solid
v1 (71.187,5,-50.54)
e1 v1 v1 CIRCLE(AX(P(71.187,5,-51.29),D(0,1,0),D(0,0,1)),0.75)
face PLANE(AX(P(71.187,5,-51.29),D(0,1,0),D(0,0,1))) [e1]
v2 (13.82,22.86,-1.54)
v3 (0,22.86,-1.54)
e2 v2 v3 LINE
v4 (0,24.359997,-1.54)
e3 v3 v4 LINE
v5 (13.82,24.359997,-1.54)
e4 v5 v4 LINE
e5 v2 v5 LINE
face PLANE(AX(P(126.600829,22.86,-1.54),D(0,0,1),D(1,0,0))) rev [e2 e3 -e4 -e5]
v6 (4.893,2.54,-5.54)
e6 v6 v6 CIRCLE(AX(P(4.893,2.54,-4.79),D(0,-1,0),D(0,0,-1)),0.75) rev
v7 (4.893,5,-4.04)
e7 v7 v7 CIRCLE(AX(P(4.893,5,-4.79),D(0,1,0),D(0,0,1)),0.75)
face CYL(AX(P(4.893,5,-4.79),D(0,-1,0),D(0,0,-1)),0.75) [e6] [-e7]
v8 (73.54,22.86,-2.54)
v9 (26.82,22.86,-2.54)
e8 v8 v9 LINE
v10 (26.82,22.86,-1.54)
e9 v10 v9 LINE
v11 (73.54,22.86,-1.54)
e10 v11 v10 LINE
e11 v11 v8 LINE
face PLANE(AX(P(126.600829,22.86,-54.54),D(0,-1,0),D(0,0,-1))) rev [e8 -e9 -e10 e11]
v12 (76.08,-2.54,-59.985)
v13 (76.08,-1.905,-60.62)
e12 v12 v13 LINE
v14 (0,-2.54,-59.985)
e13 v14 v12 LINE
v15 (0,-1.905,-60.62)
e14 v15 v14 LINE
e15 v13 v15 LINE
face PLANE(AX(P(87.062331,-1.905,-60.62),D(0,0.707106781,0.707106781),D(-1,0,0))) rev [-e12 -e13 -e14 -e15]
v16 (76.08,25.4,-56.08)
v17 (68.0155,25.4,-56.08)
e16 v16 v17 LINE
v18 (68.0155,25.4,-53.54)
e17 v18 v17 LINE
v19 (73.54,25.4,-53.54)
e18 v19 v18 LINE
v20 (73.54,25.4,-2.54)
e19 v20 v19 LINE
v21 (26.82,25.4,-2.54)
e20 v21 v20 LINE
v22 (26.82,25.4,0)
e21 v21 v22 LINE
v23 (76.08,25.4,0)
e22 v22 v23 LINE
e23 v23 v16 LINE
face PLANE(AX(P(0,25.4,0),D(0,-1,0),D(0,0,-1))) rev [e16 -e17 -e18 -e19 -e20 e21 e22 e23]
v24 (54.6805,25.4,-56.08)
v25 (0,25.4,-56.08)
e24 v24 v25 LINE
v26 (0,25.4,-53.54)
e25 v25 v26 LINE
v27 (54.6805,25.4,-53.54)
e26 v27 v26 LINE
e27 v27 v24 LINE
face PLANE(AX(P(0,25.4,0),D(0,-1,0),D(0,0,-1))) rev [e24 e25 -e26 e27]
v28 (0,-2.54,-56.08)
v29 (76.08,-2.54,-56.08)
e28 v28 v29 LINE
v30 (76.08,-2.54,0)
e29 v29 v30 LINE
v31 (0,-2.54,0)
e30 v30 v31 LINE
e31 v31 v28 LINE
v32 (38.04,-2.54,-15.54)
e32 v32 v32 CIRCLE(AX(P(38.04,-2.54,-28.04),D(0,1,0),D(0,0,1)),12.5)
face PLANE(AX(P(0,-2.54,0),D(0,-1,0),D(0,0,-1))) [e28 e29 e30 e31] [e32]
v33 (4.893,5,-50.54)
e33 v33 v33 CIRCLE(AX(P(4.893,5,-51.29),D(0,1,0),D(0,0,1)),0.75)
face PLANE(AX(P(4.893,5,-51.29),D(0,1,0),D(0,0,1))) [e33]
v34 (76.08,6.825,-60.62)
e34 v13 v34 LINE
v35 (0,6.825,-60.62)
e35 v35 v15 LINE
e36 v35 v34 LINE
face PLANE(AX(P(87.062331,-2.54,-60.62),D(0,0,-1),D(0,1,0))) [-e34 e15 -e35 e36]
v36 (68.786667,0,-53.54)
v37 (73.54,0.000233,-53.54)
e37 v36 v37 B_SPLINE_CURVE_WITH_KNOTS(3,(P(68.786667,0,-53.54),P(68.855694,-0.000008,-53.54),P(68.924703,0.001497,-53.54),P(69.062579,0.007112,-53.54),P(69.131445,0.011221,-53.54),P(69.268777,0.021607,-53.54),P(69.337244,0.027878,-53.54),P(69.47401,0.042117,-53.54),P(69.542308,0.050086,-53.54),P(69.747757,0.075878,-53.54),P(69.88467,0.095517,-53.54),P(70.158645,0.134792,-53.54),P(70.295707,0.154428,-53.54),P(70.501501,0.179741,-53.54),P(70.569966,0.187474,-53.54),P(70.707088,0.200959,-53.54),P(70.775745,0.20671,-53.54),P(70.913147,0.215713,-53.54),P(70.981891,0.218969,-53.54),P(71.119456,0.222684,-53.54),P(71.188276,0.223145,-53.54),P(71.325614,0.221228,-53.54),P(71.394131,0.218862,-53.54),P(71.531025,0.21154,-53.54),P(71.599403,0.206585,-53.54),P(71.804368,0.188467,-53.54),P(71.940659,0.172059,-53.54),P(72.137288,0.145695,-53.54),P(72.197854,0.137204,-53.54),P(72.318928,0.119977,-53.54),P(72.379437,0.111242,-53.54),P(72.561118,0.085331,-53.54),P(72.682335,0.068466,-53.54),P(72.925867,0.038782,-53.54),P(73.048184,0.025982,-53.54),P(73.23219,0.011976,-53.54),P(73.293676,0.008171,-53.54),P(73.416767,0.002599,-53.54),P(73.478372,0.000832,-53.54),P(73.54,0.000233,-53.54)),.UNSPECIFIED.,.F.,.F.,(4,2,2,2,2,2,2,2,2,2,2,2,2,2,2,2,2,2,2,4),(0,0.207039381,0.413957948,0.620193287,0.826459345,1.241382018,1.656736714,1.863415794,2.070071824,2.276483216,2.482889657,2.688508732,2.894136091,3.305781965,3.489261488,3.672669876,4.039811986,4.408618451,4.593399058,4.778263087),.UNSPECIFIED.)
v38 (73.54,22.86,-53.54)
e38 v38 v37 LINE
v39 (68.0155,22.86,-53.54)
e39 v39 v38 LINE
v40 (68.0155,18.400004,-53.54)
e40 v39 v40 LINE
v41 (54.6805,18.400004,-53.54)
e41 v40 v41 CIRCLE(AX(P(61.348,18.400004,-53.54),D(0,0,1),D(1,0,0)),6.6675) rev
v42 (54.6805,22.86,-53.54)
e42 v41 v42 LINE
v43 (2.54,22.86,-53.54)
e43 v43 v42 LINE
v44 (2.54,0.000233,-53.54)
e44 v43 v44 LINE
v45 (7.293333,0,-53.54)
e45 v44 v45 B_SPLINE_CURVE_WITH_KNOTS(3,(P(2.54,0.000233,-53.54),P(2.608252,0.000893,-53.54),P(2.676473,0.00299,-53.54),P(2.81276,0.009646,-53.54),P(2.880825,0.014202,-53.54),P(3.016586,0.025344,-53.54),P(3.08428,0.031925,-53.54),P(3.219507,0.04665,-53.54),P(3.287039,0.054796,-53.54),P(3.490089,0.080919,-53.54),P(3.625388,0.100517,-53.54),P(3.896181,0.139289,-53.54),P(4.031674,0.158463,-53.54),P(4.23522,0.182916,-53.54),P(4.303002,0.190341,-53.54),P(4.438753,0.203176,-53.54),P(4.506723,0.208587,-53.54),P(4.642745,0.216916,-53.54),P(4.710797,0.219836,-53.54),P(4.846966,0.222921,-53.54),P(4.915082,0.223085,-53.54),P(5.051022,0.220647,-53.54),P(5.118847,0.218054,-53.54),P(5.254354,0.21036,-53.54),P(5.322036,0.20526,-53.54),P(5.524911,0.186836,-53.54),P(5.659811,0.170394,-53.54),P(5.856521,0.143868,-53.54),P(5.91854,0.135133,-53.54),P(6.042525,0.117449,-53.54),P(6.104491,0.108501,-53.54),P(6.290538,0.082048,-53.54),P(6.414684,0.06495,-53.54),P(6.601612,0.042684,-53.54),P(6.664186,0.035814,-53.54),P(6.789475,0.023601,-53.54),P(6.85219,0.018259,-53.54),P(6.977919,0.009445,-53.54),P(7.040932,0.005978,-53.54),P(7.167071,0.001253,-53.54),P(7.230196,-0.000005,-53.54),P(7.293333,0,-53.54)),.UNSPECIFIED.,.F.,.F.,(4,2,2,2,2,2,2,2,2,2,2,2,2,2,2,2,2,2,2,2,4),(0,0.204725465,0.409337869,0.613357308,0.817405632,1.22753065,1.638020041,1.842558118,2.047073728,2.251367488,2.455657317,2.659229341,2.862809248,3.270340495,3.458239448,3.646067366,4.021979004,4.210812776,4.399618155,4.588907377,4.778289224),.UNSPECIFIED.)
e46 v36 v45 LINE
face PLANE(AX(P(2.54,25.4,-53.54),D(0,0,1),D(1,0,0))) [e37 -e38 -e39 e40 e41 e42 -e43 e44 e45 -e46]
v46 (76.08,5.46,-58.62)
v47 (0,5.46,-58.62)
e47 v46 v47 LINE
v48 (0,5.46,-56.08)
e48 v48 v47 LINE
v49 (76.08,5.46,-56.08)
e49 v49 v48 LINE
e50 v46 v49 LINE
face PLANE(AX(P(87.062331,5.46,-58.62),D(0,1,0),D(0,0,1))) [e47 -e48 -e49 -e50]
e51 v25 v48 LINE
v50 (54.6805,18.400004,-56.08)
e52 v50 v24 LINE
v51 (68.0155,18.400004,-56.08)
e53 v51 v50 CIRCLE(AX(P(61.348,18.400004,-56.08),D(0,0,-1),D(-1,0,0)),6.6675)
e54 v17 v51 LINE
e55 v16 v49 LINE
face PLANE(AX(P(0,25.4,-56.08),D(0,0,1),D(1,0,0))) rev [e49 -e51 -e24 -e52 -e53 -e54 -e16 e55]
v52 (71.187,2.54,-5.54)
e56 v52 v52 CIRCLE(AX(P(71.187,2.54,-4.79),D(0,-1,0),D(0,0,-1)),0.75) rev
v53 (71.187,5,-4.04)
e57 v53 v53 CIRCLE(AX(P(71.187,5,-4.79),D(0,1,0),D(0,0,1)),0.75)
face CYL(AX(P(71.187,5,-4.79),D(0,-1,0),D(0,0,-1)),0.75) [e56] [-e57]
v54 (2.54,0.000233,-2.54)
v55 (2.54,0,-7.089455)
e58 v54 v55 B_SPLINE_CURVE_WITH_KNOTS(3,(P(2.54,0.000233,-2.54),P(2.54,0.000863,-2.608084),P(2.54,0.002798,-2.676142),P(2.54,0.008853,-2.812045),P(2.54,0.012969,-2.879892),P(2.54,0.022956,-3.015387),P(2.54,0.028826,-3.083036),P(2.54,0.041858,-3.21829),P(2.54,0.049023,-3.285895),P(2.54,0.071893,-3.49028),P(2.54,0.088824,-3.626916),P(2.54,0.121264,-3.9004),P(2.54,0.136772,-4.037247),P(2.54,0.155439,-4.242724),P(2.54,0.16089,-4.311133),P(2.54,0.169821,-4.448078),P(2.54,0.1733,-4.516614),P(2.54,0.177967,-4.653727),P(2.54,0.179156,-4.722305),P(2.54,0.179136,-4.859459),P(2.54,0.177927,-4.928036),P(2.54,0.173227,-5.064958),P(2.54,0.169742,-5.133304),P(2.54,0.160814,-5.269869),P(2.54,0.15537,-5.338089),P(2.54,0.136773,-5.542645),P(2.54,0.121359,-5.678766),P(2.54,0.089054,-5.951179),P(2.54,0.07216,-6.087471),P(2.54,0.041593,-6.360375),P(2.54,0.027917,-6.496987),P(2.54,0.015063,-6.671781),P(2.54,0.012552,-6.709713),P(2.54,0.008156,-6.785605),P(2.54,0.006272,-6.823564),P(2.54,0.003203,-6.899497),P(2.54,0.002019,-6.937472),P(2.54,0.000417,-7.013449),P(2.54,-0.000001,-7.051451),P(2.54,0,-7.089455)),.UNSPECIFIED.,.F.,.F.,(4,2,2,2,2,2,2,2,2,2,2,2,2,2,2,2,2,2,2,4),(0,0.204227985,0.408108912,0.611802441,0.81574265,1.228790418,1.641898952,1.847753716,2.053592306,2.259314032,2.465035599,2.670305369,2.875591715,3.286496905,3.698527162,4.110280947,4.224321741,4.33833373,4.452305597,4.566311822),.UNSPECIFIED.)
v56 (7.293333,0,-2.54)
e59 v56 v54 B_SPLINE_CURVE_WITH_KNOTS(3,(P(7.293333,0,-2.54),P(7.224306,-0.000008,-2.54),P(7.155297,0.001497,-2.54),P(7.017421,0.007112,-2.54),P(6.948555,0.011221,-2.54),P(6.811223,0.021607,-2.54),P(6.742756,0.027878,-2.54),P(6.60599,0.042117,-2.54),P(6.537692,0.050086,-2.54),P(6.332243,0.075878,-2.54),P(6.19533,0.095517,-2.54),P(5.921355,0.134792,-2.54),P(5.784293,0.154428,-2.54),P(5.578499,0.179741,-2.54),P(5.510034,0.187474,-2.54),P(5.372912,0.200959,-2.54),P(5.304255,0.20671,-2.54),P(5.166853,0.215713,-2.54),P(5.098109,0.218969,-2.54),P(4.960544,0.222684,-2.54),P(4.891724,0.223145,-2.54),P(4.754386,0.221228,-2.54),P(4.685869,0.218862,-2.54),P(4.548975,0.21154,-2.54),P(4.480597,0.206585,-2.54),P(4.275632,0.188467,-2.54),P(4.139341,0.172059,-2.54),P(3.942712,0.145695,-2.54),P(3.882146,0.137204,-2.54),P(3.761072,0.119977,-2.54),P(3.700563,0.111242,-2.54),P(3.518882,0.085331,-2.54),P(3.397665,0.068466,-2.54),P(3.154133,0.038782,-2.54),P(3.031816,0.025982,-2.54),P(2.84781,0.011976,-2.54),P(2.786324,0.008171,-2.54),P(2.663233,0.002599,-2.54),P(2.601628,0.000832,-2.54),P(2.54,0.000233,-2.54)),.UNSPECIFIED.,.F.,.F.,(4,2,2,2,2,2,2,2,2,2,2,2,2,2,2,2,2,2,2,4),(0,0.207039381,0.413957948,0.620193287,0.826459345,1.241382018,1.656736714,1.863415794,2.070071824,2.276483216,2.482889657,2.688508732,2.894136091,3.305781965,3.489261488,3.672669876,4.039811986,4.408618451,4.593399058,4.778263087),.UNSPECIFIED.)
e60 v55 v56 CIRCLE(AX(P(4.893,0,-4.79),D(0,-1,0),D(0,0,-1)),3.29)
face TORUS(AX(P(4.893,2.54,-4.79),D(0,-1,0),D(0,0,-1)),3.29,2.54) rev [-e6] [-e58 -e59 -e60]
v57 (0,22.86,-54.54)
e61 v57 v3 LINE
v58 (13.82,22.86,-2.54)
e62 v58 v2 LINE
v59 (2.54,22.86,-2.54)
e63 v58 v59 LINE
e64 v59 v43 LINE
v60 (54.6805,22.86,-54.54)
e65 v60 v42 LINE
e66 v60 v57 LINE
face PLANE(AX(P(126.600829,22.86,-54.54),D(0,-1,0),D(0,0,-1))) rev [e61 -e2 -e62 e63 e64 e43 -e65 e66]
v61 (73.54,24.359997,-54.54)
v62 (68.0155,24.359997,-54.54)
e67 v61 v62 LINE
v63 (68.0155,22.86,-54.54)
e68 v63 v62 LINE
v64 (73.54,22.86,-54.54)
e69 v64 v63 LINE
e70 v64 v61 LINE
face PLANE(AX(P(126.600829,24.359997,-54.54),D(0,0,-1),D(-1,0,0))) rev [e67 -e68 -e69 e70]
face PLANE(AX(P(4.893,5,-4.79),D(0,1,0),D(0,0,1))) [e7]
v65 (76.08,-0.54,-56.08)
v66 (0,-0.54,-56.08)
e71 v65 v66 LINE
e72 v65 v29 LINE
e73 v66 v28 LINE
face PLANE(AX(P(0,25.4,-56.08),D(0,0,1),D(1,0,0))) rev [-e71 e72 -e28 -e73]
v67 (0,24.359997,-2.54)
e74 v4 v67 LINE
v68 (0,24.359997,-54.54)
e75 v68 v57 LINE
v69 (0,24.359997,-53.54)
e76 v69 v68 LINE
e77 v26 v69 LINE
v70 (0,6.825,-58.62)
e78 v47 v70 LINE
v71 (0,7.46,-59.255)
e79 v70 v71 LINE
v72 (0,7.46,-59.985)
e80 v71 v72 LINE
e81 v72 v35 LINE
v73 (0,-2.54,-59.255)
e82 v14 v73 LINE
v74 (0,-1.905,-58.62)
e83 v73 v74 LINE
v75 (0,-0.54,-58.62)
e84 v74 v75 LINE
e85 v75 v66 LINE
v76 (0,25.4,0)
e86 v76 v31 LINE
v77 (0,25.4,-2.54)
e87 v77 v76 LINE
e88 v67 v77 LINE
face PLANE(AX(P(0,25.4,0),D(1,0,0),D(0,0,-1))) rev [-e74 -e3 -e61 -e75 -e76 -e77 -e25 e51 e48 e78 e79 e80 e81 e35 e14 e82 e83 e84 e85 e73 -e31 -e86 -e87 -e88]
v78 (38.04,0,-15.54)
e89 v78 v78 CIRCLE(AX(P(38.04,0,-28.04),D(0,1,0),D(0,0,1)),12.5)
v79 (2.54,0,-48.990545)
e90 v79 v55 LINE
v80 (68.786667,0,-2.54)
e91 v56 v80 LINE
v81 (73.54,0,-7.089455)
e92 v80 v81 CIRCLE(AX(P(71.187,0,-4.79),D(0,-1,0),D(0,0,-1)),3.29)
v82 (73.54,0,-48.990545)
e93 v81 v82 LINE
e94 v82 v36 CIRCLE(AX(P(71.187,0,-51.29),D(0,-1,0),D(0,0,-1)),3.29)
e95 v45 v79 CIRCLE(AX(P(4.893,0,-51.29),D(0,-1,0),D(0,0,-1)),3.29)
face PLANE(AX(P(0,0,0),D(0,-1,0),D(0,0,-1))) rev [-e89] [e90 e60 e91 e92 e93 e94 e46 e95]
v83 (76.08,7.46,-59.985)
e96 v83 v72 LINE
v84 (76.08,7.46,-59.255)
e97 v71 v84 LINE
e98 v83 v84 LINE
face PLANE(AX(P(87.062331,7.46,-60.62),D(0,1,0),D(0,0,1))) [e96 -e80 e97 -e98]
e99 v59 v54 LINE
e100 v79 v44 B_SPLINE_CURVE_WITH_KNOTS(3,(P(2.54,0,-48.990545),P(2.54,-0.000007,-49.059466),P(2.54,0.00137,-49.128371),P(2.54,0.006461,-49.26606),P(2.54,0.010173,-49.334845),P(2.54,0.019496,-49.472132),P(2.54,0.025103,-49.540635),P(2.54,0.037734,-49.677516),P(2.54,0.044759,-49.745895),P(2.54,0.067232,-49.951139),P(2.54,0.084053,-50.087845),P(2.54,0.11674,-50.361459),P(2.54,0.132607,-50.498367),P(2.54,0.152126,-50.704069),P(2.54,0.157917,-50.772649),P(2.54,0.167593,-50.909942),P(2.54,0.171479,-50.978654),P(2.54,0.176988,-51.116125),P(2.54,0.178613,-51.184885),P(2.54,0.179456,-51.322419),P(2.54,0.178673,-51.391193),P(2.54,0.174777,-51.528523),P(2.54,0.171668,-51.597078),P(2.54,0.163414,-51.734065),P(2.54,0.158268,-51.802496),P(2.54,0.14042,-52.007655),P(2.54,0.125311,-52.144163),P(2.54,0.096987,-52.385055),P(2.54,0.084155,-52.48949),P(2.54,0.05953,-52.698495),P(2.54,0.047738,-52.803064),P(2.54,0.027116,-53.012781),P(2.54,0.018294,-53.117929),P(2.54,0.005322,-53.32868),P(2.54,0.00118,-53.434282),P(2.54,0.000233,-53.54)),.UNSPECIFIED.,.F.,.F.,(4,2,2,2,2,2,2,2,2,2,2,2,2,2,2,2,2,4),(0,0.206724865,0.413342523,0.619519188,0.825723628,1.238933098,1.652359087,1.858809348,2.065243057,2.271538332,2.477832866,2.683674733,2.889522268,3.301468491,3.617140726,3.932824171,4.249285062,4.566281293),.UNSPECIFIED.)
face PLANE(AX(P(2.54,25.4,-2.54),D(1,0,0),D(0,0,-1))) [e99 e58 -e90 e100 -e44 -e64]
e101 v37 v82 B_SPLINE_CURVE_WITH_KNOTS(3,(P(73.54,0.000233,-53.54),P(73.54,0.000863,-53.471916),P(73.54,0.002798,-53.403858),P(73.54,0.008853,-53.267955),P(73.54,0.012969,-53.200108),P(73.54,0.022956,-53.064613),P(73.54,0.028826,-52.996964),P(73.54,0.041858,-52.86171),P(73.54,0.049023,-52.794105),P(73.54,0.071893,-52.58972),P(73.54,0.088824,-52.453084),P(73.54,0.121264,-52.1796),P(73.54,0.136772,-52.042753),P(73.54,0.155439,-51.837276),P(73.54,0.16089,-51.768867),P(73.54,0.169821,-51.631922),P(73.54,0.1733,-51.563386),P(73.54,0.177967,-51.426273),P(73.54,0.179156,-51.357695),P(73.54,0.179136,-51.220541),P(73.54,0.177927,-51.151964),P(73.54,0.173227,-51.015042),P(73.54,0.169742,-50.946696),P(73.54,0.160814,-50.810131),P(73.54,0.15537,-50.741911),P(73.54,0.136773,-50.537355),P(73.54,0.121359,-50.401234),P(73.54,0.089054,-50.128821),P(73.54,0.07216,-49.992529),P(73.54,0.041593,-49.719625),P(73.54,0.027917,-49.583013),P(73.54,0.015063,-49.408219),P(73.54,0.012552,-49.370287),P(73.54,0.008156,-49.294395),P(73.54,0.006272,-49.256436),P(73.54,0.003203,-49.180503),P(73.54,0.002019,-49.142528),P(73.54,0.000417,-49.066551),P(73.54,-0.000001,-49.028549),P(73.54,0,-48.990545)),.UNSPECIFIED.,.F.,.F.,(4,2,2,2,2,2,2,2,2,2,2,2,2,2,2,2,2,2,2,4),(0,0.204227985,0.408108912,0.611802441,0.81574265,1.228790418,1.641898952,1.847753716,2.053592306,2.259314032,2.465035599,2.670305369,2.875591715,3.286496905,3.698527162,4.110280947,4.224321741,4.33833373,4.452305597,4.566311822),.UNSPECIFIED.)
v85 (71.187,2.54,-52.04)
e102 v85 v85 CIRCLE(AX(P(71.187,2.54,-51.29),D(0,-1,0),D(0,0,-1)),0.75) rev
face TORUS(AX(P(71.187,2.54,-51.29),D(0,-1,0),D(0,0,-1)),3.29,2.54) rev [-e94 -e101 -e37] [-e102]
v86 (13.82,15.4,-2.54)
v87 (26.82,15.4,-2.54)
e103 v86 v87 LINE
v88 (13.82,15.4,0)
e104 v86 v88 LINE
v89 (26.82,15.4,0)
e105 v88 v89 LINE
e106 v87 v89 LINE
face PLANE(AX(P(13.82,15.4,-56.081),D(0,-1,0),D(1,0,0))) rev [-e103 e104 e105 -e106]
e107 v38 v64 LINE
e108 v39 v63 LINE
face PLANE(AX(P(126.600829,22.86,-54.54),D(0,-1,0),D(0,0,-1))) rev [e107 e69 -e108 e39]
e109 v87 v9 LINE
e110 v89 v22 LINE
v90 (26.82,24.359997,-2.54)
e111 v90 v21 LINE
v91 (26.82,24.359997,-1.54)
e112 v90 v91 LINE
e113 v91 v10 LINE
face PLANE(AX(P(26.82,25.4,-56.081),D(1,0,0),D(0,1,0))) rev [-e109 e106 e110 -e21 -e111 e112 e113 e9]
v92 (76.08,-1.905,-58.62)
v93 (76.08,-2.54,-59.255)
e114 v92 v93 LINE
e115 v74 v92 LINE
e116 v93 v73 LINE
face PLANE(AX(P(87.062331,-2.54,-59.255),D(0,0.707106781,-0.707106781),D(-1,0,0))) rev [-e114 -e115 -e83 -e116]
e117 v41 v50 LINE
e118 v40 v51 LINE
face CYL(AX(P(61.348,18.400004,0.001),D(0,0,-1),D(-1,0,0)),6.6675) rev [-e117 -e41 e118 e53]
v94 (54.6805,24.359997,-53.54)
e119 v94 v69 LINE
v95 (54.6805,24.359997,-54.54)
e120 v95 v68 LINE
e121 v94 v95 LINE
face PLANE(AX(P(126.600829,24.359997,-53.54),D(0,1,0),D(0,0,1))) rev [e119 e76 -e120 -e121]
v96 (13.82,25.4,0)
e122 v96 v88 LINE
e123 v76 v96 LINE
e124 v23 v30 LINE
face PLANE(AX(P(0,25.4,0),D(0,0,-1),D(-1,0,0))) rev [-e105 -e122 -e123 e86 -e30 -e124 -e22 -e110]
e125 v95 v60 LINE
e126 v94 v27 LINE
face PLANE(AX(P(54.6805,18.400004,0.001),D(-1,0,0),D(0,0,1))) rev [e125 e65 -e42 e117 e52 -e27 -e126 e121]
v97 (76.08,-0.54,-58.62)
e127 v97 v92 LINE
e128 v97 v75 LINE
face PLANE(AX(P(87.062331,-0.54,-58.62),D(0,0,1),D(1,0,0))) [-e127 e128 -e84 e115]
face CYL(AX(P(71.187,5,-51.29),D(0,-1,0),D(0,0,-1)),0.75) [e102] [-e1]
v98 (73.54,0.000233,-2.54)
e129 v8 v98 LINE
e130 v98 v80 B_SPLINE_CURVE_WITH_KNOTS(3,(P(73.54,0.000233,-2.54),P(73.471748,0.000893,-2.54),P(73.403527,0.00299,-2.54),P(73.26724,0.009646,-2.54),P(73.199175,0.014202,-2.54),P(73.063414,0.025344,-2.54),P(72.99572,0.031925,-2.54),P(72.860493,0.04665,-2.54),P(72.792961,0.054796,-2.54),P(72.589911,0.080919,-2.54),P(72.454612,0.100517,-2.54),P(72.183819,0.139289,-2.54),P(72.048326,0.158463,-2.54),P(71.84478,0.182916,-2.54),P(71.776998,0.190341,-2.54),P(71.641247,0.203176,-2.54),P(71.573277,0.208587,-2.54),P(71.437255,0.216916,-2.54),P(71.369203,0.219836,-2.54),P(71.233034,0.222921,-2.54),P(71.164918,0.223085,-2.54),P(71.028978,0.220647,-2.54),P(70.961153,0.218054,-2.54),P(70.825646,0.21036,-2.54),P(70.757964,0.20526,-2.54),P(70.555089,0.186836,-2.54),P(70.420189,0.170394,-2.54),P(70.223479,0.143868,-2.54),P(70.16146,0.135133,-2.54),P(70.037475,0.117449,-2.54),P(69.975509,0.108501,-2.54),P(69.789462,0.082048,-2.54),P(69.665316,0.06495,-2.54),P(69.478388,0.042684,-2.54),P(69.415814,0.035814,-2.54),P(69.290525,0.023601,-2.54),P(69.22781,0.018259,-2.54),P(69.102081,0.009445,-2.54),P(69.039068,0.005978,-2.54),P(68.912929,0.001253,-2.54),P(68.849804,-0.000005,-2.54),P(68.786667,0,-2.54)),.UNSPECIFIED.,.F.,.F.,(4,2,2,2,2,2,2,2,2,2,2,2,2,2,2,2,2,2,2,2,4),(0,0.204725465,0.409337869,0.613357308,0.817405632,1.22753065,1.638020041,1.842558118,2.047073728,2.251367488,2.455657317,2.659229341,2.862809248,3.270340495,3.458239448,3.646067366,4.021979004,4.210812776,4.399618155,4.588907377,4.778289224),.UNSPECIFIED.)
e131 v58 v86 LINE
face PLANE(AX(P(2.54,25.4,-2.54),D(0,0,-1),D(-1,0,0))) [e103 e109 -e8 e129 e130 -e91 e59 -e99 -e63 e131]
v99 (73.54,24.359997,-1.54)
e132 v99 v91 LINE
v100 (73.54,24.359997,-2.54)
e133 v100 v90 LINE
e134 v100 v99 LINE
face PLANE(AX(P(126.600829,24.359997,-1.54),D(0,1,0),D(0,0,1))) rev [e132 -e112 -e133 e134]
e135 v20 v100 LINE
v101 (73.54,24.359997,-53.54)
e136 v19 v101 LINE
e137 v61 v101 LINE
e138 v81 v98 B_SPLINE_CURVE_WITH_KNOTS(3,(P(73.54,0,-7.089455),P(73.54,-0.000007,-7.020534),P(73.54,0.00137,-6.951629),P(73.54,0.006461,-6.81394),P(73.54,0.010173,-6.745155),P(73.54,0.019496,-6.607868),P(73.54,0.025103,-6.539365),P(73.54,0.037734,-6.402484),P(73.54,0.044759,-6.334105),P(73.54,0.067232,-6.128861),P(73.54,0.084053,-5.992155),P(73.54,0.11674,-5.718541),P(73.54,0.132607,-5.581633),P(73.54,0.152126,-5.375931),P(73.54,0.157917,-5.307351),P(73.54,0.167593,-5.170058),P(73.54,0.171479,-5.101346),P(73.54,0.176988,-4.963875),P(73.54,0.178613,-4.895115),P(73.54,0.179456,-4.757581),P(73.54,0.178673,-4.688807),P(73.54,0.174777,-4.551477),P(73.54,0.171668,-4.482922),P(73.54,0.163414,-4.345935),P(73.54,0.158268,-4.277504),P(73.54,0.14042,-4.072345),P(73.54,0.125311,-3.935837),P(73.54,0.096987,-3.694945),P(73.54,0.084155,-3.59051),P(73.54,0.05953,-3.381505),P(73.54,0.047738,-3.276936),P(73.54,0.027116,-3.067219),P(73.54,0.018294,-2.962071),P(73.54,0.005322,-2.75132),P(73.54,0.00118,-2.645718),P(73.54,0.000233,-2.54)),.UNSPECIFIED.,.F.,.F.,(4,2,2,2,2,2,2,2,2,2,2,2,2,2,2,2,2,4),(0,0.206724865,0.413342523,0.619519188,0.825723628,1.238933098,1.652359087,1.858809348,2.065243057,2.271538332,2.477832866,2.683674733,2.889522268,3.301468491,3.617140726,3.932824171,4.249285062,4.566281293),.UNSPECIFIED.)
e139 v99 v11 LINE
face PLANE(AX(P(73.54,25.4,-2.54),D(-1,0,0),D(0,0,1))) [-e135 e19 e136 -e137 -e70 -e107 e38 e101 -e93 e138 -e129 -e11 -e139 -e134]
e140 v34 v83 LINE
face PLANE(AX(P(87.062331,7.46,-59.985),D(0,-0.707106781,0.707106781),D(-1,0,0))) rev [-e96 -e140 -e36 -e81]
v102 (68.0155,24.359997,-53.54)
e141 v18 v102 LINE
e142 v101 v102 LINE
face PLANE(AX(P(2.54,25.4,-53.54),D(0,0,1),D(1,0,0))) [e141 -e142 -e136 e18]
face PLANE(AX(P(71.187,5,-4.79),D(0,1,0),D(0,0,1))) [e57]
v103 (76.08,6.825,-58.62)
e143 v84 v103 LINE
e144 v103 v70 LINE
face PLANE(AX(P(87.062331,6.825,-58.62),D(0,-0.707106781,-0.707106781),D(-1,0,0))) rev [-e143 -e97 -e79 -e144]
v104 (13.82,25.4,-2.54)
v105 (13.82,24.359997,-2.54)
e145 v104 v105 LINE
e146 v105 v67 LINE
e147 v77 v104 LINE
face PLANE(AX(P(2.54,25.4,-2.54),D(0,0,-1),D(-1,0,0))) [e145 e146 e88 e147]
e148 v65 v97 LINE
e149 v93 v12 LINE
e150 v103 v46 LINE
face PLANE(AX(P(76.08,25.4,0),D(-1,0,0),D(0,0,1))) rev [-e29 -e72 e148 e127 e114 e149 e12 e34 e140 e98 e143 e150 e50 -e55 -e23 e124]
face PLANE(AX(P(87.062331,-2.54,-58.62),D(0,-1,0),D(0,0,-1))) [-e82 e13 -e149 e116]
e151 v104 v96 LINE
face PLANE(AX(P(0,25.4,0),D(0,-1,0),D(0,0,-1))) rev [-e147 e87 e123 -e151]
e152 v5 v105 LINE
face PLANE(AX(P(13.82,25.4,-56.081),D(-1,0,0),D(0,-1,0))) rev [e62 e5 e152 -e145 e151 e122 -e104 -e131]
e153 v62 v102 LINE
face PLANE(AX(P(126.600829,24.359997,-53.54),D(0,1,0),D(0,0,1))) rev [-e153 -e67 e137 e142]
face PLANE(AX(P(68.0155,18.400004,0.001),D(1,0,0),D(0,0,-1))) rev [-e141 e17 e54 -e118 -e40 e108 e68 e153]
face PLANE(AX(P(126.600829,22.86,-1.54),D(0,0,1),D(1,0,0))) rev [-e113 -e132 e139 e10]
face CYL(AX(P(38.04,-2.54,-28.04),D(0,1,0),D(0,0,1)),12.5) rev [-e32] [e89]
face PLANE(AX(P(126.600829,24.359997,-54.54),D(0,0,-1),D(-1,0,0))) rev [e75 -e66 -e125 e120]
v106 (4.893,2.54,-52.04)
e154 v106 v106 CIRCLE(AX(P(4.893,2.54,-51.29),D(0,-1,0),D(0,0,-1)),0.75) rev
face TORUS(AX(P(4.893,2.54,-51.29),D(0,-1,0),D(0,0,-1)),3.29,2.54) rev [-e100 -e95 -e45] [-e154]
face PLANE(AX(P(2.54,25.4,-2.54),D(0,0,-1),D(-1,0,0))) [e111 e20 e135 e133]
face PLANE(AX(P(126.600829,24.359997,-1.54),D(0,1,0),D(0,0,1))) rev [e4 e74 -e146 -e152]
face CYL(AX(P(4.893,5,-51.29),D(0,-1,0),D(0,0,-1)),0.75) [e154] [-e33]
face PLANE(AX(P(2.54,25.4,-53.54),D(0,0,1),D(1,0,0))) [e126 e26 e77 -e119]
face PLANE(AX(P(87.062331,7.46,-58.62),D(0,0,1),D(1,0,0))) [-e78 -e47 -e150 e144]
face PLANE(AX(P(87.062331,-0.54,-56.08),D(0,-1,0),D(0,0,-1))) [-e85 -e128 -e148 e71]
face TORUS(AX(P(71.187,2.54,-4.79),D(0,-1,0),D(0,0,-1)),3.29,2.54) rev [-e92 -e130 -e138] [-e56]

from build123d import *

# Parameters (mm, degrees)
SKETCH1_W           = 76.08
SKETCH1_H           = 56.08
SKETCH1_W_2         = 71
SKETCH1_H_2         = 51
BOSS_EXTRUDE1_DEPTH = 25.4
SKETCH2_W           = 76.08
SKETCH2_H           = 56.08
BOSS_EXTRUDE2_DEPTH = 2.54
CUT_EXTRUDE1_REACH  = 99.869
CUT_EXTRUDE2_REACH  = 99.869
SKETCH5_R           = 0.75
BOSS_EXTRUDE3_DEPTH = 5
FILLET1_R           = 2.54
CUT_EXTRUDE3_REACH  = 99.869
SKETCH6_W           = 13
SKETCH6_H           = 10
BOSS_EXTRUDE4_DEPTH = 76.08
CHAMFER1_SIZE       = 0.635
SKETCH9_R           = 12.5
CUT_EXTRUDE4_DEPTH  = 101.539100877


with BuildPart() as part:
    # Sketch1 → Boss-Extrude1 (new body)
    with BuildSketch(Plane(origin=(0, 0, 0), x_dir=(1, 0, 0), z_dir=(0, 1, 0))):
        with Locations((38.04, 28.04)):
            Rectangle(SKETCH1_W, SKETCH1_H)
        with Locations((38.04, 28.04)):
            Rectangle(SKETCH1_W_2, SKETCH1_H_2, mode=Mode.SUBTRACT)
    extrude(amount=BOSS_EXTRUDE1_DEPTH)

    # Sketch2 → Boss-Extrude2 (add)
    with BuildSketch(Plane.XZ):
        with Locations((38.04, -28.04)):
            Rectangle(SKETCH2_W, SKETCH2_H)
    extrude(amount=BOSS_EXTRUDE2_DEPTH)

    # Sketch3 → Cut-Extrude1 (cut, up to next)
    with BuildSketch(Plane(origin=(0, 0, -56.08), x_dir=(-1, 0, 0), z_dir=(0, 0, -1)), mode=Mode.PRIVATE) as cut_extrude1_sk1:
        with BuildLine():
            Line((-68.0155, 18.400004), (-68.0155, 25.4))
            Line((-68.0155, 25.4), (-54.6805, 25.4))
            Line((-54.6805, 25.4), (-54.6805, 18.400004))
            ThreePointArc((-54.6805, 18.400004), (-61.348, 11.732504), (-68.0155, 18.400004))
        make_face()
    cut_extrude1_tool1 = extrude(cut_extrude1_sk1.sketch, amount=-CUT_EXTRUDE1_REACH, mode=Mode.PRIVATE) & part.part
    add(cut_extrude1_tool1.solids().sort_by_distance((61.348, 19.19119, -56.08))[0], mode=Mode.SUBTRACT)

    # Cut-Extrude2: up to this face of the body (flat: up to its plane)
    cut_extrude2_end = Plane(part.part.faces().sort_by_distance((73.54, 12.7, -28.04))[0])
    # Sketch4 → Cut-Extrude2 (cut, up to the picked face)
    with BuildSketch(Plane.ZY, mode=Mode.PRIVATE) as cut_extrude2_sk1:
        Polygon((-53.54, 25.4), (-53.54, 24.359997), (-54.54, 24.359997), (-54.54, 22.86), (-1.54, 22.86), (-1.54, 24.359997), (-2.54, 24.359997), (-2.54, 25.4), align=None)
    cut_extrude2_tool1 = split(extrude(cut_extrude2_sk1.sketch, amount=-CUT_EXTRUDE2_REACH, mode=Mode.PRIVATE), bisect_by=cut_extrude2_end, keep=Keep.BOTH, mode=Mode.PRIVATE)
    add(cut_extrude2_tool1.solids().sort_by(Axis((0, 24.11823, -28.04), (1, 0, 0)))[0], mode=Mode.SUBTRACT)

    # Sketch5 → Boss-Extrude3 (add)
    with BuildSketch(Plane(origin=(0, 0, 0), x_dir=(1, 0, 0), z_dir=(0, 1, 0))):
        with Locations(Location((4.893, 51.28999999, 0), (0, 0, 90))):
            Circle(SKETCH5_R)
        with Locations(Location((4.893, 4.79000001, 0), (0, 0, 90))):
            Circle(SKETCH5_R)
        with Locations(Location((71.187, 4.79000001, 0), (0, 0, 90))):
            Circle(SKETCH5_R)
        with Locations(Location((71.187, 51.28999999, 0), (0, 0, 90))):
            Circle(SKETCH5_R)
    extrude(amount=BOSS_EXTRUDE3_DEPTH)

    # Fillet1
    # the kernel refuses this fillet: 2.54 mm, written as the material it adds along each edge
    with BuildSketch(Plane(origin=(4.893, 0, -51.28999999), x_dir=(0, 0, -1), z_dir=(1, 0, 0))) as fillet1_piece_1:
        with BuildLine():
            CenterArc((0.75 + FILLET1_R, FILLET1_R), FILLET1_R, 180, 90)
            Line((0.75, FILLET1_R), (0.75, 0))
            Line((0.75, 0), (0.75 + FILLET1_R, 0))
        make_face()
    revolve(axis=Axis((4.893, 0, -51.28999999), (0, 1, 0)))
    with BuildSketch(Plane(origin=(4.893, 0, -4.79000001), x_dir=(0, 0, -1), z_dir=(1, 0, 0))) as fillet1_piece_2:
        with BuildLine():
            CenterArc((0.75 + FILLET1_R, FILLET1_R), FILLET1_R, 180, 90)
            Line((0.75, FILLET1_R), (0.75, 0))
            Line((0.75, 0), (0.75 + FILLET1_R, 0))
        make_face()
    revolve(axis=Axis((4.893, 0, -4.79000001), (0, 1, 0)))
    with BuildSketch(Plane(origin=(71.187, 0, -4.79000001), x_dir=(0, 0, -1), z_dir=(1, 0, 0))) as fillet1_piece_3:
        with BuildLine():
            CenterArc((0.75 + FILLET1_R, FILLET1_R), FILLET1_R, 180, 90)
            Line((0.75, FILLET1_R), (0.75, 0))
            Line((0.75, 0), (0.75 + FILLET1_R, 0))
        make_face()
    revolve(axis=Axis((71.187, 0, -4.79000001), (0, 1, 0)))
    with BuildSketch(Plane(origin=(71.187, 0, -51.28999999), x_dir=(0, 0, -1), z_dir=(1, 0, 0))) as fillet1_piece_4:
        with BuildLine():
            CenterArc((0.75 + FILLET1_R, FILLET1_R), FILLET1_R, 180, 90)
            Line((0.75, FILLET1_R), (0.75, 0))
            Line((0.75, 0), (0.75 + FILLET1_R, 0))
        make_face()
    revolve(axis=Axis((71.187, 0, -51.28999999), (0, 1, 0)))

    # Sketch6 → Cut-Extrude3 (cut, up to next)
    with BuildSketch(Plane.XY, mode=Mode.PRIVATE) as cut_extrude3_sk1:
        with Locations((20.32, 20.4)):
            Rectangle(SKETCH6_W, SKETCH6_H)
    cut_extrude3_tool1 = extrude(cut_extrude3_sk1.sketch, amount=-CUT_EXTRUDE3_REACH, mode=Mode.PRIVATE) & part.part
    add(cut_extrude3_tool1.solids().sort_by_distance((20.32, 20.4, 0))[0], mode=Mode.SUBTRACT)

    # Sketch7 → Boss-Extrude4 (add)
    with BuildSketch(Plane.ZY):
        Polygon((-56.08, -0.54), (-58.62, -0.54), (-58.62, -2.54), (-60.62, -2.54), (-60.62, 7.46), (-58.62, 7.46), (-58.62, 5.46), (-56.08, 5.46), align=None)
    extrude(amount=-BOSS_EXTRUDE4_DEPTH)

    # Chamfer1
    chamfer1_edges = [part.edges().sort_by_distance(p)[0] for p in [
        (38.04, -2.54, -58.62),
        (38.04, -2.54, -60.62),
        (38.04, 7.46, -60.62),
        (38.04, 7.46, -58.62),
    ]]
    chamfer(chamfer1_edges, length=CHAMFER1_SIZE)

    # Sketch9 → Cut-Extrude4 (cut, through all)
    with BuildSketch(Plane(origin=(0, 0, 0), x_dir=(1, 0, 0), z_dir=(0, 1, 0))):
        with Locations(Location((38.04, 28.04, 0), (0, 0, 270))):
            Circle(SKETCH9_R)
    extrude(amount=-CUT_EXTRUDE4_DEPTH, mode=Mode.SUBTRACT)


solid = part.part
